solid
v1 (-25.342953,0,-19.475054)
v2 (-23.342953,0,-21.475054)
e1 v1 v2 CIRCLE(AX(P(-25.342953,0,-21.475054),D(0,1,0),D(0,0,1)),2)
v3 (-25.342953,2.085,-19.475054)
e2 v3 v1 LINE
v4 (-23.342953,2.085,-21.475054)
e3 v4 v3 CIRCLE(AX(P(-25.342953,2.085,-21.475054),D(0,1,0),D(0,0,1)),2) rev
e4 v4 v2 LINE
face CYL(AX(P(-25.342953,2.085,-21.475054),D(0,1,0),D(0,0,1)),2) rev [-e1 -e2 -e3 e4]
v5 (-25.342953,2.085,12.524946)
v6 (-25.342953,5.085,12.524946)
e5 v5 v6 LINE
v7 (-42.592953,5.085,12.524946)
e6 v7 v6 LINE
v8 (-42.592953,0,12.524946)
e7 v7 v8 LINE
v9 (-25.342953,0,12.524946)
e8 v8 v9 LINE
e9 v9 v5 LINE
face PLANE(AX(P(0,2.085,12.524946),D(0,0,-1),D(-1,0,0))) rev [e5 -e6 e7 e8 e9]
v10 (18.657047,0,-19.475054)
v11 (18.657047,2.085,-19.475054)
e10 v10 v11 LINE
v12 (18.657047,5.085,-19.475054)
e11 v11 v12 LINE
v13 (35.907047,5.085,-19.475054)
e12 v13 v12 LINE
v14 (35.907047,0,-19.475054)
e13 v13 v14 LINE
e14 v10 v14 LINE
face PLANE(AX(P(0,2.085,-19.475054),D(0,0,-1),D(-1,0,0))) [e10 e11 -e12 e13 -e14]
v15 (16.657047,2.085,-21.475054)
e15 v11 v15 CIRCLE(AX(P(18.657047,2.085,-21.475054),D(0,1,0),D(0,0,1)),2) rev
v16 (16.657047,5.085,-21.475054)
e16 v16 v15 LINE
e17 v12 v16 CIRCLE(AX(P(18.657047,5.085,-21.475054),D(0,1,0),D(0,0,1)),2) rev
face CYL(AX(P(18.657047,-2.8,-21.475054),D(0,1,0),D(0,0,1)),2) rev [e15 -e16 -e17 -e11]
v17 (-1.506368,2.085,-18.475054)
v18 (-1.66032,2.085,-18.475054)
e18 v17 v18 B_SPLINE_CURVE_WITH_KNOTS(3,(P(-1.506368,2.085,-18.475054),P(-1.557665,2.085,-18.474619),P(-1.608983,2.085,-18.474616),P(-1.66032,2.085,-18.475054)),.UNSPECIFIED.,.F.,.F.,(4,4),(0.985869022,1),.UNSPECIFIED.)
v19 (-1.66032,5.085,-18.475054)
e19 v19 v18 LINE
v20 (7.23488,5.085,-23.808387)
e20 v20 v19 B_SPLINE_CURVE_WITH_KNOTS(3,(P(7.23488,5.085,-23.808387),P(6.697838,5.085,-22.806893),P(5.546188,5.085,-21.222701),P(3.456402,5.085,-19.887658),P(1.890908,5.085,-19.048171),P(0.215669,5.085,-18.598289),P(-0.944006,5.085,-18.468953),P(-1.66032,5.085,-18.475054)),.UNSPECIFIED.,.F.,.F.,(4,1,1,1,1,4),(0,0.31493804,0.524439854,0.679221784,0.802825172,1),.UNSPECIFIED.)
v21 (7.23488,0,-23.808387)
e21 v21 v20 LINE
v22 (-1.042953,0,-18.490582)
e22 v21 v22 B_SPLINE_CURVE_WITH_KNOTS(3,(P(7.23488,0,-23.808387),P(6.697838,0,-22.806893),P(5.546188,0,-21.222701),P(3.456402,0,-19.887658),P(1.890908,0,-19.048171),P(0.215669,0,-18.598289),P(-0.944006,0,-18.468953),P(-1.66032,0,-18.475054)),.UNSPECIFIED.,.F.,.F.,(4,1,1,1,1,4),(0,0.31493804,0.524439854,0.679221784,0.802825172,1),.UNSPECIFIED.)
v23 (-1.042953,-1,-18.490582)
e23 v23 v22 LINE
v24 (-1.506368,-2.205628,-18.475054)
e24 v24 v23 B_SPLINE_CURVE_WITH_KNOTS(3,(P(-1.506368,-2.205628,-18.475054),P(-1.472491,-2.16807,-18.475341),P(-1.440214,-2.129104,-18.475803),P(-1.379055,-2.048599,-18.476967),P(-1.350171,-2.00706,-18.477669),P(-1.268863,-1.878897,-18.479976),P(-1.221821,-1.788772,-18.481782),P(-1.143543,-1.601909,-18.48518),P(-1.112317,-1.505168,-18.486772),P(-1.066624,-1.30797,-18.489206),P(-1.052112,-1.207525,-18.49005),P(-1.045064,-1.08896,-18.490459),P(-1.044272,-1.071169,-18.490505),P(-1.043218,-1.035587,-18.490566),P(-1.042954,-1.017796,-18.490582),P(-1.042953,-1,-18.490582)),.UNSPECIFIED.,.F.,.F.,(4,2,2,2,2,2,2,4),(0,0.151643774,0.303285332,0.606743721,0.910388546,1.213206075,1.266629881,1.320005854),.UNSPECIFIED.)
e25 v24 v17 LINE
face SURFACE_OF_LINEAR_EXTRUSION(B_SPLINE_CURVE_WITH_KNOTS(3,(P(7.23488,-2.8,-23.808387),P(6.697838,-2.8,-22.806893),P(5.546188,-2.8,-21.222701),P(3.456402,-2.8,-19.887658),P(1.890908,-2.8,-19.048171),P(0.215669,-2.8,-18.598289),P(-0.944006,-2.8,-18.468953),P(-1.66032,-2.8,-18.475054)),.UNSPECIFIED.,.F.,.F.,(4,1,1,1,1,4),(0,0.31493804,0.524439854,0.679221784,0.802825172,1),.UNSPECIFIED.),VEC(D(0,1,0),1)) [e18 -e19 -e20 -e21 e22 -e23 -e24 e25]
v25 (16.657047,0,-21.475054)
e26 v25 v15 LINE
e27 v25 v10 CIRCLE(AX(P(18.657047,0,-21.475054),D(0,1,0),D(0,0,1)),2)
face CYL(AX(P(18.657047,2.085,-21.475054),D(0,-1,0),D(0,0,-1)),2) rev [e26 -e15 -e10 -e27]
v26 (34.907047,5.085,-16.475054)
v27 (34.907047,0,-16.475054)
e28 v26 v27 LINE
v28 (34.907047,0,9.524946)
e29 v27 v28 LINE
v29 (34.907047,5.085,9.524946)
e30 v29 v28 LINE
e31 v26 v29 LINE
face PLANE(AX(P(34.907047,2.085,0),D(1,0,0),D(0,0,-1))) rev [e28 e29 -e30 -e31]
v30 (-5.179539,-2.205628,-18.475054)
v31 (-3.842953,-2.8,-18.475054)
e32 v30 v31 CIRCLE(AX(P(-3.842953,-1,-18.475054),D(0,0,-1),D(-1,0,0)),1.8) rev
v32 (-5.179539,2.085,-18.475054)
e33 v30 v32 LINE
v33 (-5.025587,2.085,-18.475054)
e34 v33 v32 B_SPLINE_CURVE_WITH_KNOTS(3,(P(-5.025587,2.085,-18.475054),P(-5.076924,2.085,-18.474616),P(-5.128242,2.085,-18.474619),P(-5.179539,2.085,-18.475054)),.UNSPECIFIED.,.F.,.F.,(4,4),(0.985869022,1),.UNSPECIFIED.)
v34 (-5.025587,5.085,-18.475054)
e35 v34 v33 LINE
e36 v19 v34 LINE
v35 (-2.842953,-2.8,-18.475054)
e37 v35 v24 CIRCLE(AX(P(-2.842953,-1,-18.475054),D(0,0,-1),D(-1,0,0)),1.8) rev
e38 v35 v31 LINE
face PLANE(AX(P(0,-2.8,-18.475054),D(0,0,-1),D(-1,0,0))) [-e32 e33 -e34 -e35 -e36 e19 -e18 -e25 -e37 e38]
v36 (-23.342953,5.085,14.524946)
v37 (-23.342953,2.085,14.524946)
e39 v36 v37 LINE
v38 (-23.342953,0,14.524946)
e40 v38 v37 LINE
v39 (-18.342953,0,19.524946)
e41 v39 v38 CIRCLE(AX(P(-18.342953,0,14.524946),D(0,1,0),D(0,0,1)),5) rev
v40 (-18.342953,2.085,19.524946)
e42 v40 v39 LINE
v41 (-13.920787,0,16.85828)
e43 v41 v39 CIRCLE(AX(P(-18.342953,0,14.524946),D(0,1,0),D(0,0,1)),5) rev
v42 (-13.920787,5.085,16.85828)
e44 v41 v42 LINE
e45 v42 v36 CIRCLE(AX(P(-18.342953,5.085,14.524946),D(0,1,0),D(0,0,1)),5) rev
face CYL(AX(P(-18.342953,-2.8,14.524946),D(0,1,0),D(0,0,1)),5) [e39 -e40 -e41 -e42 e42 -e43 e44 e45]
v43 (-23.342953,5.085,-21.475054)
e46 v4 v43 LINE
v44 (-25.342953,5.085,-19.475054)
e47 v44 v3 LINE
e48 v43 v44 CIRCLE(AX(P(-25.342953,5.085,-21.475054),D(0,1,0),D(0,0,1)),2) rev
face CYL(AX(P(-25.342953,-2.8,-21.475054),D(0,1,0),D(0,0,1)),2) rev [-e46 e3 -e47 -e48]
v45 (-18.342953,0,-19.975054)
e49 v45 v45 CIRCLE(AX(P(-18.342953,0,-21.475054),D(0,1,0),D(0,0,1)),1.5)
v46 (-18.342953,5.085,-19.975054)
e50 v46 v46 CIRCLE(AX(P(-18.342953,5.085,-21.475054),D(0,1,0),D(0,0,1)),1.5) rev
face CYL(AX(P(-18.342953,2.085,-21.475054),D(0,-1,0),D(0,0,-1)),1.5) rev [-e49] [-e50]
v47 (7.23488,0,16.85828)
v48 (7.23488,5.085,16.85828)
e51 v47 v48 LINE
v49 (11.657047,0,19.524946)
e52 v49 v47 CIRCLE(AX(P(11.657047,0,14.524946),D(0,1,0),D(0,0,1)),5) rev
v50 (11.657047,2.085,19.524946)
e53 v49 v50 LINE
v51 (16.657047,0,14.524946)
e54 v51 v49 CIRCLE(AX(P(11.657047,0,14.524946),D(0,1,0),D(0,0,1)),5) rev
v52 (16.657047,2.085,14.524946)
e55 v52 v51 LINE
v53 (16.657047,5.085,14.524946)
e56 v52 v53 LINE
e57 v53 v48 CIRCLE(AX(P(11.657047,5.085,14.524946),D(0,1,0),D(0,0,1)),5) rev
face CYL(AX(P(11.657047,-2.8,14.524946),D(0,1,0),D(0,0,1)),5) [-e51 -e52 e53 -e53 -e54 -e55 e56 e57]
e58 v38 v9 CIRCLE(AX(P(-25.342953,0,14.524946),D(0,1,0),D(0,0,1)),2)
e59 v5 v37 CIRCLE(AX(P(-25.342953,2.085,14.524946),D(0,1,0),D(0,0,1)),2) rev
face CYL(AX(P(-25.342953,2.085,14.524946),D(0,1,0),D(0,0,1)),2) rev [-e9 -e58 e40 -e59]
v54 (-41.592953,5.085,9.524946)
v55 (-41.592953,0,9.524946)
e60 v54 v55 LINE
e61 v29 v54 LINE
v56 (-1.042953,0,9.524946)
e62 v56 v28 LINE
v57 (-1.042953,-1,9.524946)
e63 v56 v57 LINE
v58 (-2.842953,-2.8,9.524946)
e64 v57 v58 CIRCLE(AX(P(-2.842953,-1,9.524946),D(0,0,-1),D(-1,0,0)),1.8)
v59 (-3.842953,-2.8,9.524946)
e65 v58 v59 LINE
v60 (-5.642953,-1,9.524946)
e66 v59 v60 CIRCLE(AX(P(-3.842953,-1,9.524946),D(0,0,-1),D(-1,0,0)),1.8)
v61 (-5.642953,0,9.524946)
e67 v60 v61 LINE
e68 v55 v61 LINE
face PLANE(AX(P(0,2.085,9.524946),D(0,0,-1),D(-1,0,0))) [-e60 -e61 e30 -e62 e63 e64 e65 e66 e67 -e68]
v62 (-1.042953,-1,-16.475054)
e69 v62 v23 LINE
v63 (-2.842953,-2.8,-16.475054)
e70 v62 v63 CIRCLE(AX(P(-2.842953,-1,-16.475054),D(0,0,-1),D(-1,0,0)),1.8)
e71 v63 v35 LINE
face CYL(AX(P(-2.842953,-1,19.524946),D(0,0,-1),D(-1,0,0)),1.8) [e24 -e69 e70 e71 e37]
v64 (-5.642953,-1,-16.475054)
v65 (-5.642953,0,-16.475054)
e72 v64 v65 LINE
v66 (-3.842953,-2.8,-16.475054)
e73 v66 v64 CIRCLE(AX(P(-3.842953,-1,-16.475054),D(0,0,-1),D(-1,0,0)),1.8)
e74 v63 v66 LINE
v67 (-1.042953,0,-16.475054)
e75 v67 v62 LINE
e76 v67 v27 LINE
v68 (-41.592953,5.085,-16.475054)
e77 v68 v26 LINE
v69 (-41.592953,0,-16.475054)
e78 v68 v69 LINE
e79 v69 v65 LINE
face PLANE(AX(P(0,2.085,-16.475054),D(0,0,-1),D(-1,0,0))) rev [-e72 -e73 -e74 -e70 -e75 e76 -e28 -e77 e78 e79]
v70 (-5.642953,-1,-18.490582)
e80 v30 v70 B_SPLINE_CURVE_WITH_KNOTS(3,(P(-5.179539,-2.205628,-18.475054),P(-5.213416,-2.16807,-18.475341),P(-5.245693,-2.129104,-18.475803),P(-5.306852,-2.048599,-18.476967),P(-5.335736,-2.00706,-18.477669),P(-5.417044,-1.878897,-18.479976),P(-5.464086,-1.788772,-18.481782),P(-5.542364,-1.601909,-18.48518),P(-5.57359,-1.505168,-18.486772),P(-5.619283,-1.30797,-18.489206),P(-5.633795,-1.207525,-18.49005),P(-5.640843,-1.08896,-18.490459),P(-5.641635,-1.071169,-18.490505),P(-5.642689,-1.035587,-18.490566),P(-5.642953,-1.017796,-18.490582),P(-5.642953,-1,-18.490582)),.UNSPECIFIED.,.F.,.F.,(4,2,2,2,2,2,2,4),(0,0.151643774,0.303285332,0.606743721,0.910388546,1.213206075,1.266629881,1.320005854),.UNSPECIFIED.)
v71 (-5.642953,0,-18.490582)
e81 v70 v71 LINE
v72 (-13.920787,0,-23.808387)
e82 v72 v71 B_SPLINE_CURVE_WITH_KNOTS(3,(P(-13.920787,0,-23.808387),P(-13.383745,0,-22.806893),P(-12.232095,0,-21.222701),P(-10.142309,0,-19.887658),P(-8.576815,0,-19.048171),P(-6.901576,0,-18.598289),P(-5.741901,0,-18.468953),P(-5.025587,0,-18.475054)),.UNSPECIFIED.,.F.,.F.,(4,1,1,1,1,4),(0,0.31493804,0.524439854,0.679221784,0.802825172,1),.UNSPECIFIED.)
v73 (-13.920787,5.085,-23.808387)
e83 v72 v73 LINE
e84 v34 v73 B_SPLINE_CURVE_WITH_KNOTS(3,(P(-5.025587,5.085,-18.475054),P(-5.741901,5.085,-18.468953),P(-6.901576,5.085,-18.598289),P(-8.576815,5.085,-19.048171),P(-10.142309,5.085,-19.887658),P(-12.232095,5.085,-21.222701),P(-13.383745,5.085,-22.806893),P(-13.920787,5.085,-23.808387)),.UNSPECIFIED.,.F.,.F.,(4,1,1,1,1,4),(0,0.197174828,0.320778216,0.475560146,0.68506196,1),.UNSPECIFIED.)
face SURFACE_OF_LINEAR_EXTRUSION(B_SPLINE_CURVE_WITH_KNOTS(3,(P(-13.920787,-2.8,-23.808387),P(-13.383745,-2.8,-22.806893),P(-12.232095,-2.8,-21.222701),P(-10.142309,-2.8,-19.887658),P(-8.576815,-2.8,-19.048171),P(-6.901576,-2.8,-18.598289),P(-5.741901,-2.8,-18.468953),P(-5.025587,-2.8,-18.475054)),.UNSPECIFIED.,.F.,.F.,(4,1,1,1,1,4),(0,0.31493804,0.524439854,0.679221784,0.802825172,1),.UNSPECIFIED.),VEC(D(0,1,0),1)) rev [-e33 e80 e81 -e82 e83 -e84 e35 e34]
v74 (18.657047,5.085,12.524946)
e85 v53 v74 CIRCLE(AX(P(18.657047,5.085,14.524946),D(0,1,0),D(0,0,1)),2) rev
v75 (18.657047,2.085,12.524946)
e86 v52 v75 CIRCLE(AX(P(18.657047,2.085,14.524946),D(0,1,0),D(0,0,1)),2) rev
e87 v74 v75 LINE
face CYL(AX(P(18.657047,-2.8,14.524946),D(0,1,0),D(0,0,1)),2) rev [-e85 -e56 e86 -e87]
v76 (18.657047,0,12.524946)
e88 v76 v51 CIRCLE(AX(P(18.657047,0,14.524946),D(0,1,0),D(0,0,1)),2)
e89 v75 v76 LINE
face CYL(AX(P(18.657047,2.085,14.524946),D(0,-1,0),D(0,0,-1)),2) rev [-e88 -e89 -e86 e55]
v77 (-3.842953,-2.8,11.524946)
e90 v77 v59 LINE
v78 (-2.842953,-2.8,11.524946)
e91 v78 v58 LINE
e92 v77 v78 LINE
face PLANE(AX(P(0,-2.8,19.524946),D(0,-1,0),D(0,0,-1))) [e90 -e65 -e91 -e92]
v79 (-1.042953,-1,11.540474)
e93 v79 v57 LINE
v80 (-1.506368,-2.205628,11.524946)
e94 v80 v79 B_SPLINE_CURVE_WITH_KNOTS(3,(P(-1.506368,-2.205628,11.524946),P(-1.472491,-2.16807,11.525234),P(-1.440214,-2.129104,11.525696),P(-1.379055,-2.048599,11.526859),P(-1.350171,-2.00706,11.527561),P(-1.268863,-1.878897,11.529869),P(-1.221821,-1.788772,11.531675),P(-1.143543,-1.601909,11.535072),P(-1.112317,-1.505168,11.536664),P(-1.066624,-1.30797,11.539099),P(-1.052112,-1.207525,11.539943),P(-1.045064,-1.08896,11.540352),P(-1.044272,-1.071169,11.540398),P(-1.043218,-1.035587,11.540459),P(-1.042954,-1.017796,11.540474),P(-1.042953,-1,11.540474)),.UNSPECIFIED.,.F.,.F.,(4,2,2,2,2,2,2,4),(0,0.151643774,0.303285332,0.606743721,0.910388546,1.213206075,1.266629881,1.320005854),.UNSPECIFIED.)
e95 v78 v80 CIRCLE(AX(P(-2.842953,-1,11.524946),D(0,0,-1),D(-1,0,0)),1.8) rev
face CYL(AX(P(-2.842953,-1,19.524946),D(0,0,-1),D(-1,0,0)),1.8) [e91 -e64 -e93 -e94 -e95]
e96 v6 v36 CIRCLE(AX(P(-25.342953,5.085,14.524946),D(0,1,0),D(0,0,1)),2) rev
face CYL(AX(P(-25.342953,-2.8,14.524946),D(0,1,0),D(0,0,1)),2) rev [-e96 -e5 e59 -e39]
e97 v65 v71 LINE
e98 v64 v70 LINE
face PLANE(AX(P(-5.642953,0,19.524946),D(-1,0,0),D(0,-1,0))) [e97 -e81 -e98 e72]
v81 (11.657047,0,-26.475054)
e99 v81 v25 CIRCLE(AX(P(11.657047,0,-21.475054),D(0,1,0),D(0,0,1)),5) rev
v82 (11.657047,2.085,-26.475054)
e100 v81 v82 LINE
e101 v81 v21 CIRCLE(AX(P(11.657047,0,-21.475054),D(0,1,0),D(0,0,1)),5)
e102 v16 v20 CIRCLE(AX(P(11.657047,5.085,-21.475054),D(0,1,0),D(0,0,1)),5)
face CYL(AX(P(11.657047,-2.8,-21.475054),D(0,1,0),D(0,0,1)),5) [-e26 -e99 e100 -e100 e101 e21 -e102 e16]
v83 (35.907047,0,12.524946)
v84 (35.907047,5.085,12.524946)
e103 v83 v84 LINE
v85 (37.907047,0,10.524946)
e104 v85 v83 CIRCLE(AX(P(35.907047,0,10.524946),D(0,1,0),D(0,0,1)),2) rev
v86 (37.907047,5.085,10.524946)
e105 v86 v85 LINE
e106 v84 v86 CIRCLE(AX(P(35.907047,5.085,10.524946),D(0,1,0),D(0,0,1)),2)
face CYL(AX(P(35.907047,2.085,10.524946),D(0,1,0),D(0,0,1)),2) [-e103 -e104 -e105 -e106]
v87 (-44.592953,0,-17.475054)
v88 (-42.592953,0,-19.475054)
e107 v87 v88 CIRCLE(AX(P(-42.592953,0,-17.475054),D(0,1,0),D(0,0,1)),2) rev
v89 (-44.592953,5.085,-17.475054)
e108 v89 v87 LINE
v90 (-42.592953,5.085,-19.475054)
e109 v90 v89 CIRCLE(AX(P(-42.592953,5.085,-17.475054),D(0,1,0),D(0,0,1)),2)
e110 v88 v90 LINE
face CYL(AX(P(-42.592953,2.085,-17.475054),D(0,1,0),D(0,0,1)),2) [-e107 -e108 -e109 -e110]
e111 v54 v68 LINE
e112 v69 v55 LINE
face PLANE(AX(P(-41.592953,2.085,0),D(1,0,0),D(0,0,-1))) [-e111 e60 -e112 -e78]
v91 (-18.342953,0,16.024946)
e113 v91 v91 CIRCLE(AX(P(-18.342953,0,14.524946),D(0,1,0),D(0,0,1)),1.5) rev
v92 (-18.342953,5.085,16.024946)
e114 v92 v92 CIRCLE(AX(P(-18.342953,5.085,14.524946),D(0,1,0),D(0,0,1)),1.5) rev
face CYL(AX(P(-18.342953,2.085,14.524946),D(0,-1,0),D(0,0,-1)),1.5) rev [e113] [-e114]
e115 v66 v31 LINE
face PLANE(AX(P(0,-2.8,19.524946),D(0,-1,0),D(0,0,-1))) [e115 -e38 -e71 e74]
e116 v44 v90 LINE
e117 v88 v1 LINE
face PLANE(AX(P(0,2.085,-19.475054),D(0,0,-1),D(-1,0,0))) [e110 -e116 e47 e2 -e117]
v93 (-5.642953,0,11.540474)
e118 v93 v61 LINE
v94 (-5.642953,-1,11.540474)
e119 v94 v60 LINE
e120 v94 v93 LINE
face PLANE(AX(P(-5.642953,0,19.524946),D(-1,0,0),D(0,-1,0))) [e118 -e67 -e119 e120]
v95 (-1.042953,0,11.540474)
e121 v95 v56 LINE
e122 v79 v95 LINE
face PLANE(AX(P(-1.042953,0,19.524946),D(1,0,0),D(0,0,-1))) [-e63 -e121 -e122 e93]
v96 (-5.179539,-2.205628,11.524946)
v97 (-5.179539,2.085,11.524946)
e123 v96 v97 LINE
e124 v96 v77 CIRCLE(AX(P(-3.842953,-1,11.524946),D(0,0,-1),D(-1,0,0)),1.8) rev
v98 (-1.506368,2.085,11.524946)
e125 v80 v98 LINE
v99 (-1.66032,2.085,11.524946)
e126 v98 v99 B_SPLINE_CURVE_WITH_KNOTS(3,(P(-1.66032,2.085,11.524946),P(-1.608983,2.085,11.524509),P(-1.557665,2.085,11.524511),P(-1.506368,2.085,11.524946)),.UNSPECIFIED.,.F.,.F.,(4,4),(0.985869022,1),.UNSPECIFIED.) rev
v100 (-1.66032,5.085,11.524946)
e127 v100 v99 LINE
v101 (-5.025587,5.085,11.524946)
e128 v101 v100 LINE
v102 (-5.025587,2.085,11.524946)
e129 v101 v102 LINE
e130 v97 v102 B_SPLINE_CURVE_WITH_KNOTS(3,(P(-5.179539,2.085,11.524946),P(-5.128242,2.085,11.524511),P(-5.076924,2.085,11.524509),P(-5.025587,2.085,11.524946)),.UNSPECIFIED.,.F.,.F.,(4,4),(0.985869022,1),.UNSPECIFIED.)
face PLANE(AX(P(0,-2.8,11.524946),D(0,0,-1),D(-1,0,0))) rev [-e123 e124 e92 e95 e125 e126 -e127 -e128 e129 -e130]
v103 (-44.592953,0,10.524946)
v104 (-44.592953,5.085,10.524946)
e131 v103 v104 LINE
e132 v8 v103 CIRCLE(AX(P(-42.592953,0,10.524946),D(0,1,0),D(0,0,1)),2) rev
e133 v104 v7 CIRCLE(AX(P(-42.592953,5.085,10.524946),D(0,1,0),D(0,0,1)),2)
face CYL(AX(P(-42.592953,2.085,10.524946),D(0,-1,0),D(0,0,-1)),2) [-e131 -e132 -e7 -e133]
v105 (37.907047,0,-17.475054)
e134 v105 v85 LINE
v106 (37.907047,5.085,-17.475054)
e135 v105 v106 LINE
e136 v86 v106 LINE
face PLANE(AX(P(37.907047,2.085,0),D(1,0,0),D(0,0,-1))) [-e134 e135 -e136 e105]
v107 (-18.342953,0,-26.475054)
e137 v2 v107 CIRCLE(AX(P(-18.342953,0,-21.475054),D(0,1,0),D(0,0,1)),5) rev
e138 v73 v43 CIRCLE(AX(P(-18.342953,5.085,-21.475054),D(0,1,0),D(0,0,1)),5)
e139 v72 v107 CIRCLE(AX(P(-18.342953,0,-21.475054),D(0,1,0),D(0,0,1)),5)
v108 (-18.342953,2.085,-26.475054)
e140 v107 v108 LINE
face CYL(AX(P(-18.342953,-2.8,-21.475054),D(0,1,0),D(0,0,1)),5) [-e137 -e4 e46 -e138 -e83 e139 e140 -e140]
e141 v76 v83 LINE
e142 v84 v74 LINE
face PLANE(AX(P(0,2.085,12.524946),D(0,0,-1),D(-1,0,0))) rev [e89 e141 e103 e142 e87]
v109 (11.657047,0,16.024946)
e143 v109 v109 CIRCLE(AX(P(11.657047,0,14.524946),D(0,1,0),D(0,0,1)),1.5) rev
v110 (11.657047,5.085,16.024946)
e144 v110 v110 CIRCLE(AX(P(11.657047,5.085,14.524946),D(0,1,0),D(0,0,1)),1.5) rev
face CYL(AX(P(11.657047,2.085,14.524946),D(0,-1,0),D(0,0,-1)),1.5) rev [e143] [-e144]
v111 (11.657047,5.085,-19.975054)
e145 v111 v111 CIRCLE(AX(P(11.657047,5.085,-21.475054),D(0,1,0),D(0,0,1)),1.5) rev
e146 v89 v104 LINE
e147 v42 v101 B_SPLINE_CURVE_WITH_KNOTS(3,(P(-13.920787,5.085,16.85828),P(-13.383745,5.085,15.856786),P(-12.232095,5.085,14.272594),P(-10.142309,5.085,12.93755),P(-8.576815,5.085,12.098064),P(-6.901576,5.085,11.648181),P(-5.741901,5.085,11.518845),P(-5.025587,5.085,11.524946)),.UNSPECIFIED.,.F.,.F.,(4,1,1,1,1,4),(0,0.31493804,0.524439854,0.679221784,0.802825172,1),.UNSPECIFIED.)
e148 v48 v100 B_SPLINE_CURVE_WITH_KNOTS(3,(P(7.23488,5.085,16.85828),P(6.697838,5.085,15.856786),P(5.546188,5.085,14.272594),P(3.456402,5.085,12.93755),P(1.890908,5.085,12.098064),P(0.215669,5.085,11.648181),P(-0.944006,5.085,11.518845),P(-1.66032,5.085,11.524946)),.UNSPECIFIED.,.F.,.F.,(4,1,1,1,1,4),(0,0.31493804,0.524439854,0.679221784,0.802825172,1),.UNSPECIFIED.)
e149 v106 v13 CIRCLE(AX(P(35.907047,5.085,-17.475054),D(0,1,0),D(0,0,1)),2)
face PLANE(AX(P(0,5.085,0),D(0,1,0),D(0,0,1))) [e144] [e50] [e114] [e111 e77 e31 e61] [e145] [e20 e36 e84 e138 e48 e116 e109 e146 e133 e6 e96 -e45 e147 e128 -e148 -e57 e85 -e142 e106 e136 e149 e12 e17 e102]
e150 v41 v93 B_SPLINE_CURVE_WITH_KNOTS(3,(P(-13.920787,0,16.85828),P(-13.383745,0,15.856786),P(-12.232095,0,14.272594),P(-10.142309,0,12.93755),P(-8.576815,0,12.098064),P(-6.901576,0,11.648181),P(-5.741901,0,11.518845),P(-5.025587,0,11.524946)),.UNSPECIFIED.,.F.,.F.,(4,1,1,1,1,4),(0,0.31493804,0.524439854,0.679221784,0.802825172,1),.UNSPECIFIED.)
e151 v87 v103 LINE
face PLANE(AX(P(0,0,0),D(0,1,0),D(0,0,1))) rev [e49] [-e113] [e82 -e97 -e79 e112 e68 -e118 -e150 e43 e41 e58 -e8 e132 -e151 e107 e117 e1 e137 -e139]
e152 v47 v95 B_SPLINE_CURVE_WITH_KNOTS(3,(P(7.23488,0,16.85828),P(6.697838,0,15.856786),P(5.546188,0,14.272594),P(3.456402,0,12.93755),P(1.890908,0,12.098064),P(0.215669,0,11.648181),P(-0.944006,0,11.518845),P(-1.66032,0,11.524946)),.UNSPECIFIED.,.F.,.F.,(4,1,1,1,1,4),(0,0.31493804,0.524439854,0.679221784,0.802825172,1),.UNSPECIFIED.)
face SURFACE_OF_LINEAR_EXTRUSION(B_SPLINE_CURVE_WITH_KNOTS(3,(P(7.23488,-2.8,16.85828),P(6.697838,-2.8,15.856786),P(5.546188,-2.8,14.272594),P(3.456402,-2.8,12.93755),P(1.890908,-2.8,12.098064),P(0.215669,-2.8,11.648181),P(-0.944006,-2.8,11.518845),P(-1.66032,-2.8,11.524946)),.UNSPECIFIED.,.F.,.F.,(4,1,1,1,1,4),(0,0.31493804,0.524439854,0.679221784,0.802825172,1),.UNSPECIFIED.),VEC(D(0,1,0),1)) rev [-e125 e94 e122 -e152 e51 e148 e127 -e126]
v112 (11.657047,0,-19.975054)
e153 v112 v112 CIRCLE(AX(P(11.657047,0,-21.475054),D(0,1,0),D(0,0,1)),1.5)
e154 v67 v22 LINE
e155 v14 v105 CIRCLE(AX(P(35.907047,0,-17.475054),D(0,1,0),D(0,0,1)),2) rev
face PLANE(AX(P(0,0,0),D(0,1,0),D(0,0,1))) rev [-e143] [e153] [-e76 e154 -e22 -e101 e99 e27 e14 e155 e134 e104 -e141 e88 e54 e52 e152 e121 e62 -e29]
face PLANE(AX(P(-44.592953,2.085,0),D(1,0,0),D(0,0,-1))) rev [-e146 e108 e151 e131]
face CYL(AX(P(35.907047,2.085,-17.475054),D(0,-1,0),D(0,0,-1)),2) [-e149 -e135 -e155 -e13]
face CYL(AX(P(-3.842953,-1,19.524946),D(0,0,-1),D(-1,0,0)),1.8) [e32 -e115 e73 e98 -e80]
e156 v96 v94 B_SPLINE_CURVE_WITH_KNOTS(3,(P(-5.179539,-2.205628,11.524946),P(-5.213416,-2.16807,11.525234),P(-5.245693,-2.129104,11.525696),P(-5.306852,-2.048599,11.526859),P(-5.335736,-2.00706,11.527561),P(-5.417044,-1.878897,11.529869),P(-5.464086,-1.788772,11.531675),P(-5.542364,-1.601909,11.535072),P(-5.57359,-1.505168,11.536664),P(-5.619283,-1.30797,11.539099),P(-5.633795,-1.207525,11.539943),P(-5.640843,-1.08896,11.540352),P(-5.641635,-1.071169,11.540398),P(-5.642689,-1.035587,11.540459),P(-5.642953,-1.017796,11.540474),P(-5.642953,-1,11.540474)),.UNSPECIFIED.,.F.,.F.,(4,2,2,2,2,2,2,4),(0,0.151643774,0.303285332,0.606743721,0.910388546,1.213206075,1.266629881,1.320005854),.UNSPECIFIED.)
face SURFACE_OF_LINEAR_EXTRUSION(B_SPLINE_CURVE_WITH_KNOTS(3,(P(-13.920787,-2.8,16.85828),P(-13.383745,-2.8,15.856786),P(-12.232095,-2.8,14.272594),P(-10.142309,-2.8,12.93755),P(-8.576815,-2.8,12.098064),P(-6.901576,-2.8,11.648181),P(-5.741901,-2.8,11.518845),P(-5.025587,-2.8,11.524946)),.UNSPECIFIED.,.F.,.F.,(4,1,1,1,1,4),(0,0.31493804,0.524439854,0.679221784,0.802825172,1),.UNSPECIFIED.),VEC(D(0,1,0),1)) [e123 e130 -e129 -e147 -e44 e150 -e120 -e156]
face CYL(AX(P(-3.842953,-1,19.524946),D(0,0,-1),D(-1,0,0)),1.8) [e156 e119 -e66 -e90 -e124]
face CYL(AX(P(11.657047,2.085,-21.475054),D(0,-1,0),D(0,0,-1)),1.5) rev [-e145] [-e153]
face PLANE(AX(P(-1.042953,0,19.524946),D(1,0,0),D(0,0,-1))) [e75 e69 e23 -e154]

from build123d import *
from build123d.topology import SkipClean

# Parameters (mm, degrees)
SKETCH1_W           = 40
SKETCH1_H           = 7
SKETCH1_R           = 1.5
SKETCH1_W_2         = 82.5
SKETCH1_H_2         = 32
SKETCH1_W_3         = 76.5
SKETCH1_H_3         = 26
BOSS_EXTRUDE1_DEPTH = 2.085
SKETCH2_W           = 5
SKETCH2_H           = 10
BOSS_EXTRUDE2_DEPTH = 3
FILLET1_R           = 2
FILLET2_R           = 2
CUT_EXTRUDE1_DEPTH  = 65.136818612
SKETCH4_W           = 30
SKETCH4_H           = 6.817038716
CUT_EXTRUDE2_DEPTH  = 53.089568977
FILLET3_R           = 5
FILLET4_R           = 2
BOSS_EXTRUDE3_START = 3
SKETCH5_R           = 1.5
BOSS_EXTRUDE3_DEPTH = 3
FILLET5_START       = 2.085
FILLET5_DEPTH       = 3


with BuildPart() as part:
    # Sketch1 → Boss-Extrude1 (new body)
    # profile 1 of 3: a face of its own
    with BuildSketch(Plane(origin=(0, 0, 0), x_dir=(1, 0, 0), z_dir=(0, 1, 0))):
        with Locations((-3.342953498, -16.024946279)):
            Rectangle(SKETCH1_W, SKETCH1_H)
        with Locations(Location((-18.342953498, -14.524946279, 0), (0, 0, 270))):
            Circle(SKETCH1_R, mode=Mode.SUBTRACT)
        with Locations(Location((11.657046502, -14.524946279, 0), (0, 0, 270))):
            Circle(SKETCH1_R, mode=Mode.SUBTRACT)
    # profile 2 of 3: a face of its own
    with BuildSketch(Plane(origin=(0, 0, 0), x_dir=(1, 0, 0), z_dir=(0, 1, 0))):
        with Locations((-3.342953498, 3.475053721)):
            Rectangle(SKETCH1_W_2, SKETCH1_H_2)
        with Locations((-3.342953498, 3.475053721)):
            Rectangle(SKETCH1_W_3, SKETCH1_H_3, mode=Mode.SUBTRACT)
    # profile 3 of 3: a face of its own
    with BuildSketch(Plane(origin=(0, 0, 0), x_dir=(1, 0, 0), z_dir=(0, 1, 0))):
        with Locations((-3.342953498, 22.975053721)):
            Rectangle(SKETCH1_W, SKETCH1_H)
        with Locations(Location((-18.342953498, 21.475053721, 0), (0, 0, 270))):
            Circle(SKETCH1_R, mode=Mode.SUBTRACT)
        with Locations(Location((11.657046502, 21.475053721, 0), (0, 0, 270))):
            Circle(SKETCH1_R, mode=Mode.SUBTRACT)
    extrude(amount=BOSS_EXTRUDE1_DEPTH)

    # Sketch2 → Boss-Extrude2 (add)
    with BuildSketch(Plane.XZ):
        with Locations((-3.342953498, 14.524946279)):
            Rectangle(SKETCH2_W, SKETCH2_H)
        with Locations((-3.342953498, -21.475053721)):
            Rectangle(SKETCH2_W, SKETCH2_H)
    extrude(amount=BOSS_EXTRUDE2_DEPTH)

    # Fillet1
    fillet1_edges = [part.edges().sort_by_distance(p)[0] for p in [
        (-5.842953498, -3, 14.524946279),
        (-0.842953498, -3, 14.524946279),
        (-0.842953498, -3, -21.475053721),
        (-5.842953498, -3, -21.475053721),
    ]]
    fillet(fillet1_edges, radius=FILLET1_R)

    # Fillet2
    fillet2_edges = [part.edges().sort_by_distance(p)[0] for p in [
        (-44.592953498, 1.0425, 12.524946279),
        (-44.592953498, 1.0425, -19.475053721),
        (37.907046502, 1.0425, -19.475053721),
        (37.907046502, 1.0425, 12.524946279),
    ]]
    fillet(fillet2_edges, radius=FILLET2_R)

    # Sketch3 → Cut-Extrude1 (cut, through all)
    with BuildSketch(Plane(origin=(0, 0, -26.475053721), x_dir=(-1, 0, 0), z_dir=(0, 0, -1))):
        with BuildLine():
            Line((5.842953498, -1), (5.842953498, 0))
            Line((5.842953498, 0), (5.642953498, 0))
            Line((5.642953498, 0), (5.642953498, -1))
            ThreePointArc((5.642953498, -1), (5.115745704, -2.272792206), (3.842953498, -2.8))
            Line((3.842953498, -2.8), (2.842953498, -2.8))
            ThreePointArc((2.842953498, -2.8), (1.570161291, -2.272792206), (1.042953498, -1))
            Line((1.042953498, -1), (1.042953498, 0))
            Line((1.042953498, 0), (0.842953498, 0))
            Line((0.842953498, 0), (0.842953498, -1))
            ThreePointArc((0.842953498, -1), (1.428739935, -2.414213562), (2.842953498, -3))
            Line((2.842953498, -3), (3.842953498, -3))
            ThreePointArc((3.842953498, -3), (5.25716706, -2.414213562), (5.842953498, -1))
        make_face()
    extrude(amount=-CUT_EXTRUDE1_DEPTH, mode=Mode.SUBTRACT)

    # Sketch4 → Cut-Extrude2 (cut, through all)
    with BuildSketch(Plane(origin=(0, 2.085, 0), x_dir=(1, 0, 0), z_dir=(0, 1, 0))):
        with BuildLine():
            Line((-5.025587433, 18.475053721), (-3.342953498, 18.475053721))
            Line((-3.342953498, 18.475053721), (-1.660319563, 18.475053721))
            Line((-1.660319563, 18.475053721), (-1.5063675, 18.475053721))
            add(Edge.make_bspline(
                [(7.234880115, 23.808387054), (6.697838422, 22.80689338), (5.54618786, 21.222701251), (3.456402004, 19.887657692), (1.890908212, 19.048171258), (0.265447838, 18.611656881), (-0.841891354, 18.480685845), (-1.5063675, 18.475053721)],
                knots=[0, 0, 0, 0, 0.31493804, 0.524439854, 0.679221784, 0.802825172, 0.985869019, 0.985869019, 0.985869019, 0.985869019], degree=3))
            ThreePointArc((7.234880115, 23.808387054), (9.075057605, 25.756797914), (11.657046502, 26.475053721))
            Line((11.657046502, 26.475053721), (-18.342953498, 26.475053721))
            ThreePointArc((-18.342953498, 26.475053721), (-15.7609646, 25.756797914), (-13.92078711, 23.808387054))
            add(Edge.make_bspline(
                [(-13.92078711, 23.808387054), (-13.383745417, 22.80689338), (-12.232094855, 21.222701251), (-10.142308999, 19.887657692), (-8.576815207, 19.048171258), (-6.951354833, 18.611656881), (-5.844015641, 18.480685845), (-5.179539495, 18.475053721)],
                knots=[0, 0, 0, 0, 0.31493804, 0.524439854, 0.679221784, 0.802825172, 0.985869019, 0.985869019, 0.985869019, 0.985869019], degree=3))
            Line((-5.179539495, 18.475053721), (-5.025587433, 18.475053721))
        make_face()
        with Locations((-3.342953498, 29.883573079)):
            Rectangle(SKETCH4_W, SKETCH4_H)
        with BuildLine():
            ThreePointArc((-13.92078711, -16.858279612), (-15.7609646, -18.806690472), (-18.342953498, -19.524946279))
            Line((-18.342953498, -19.524946279), (11.657046502, -19.524946279))
            ThreePointArc((11.657046502, -19.524946279), (9.075057605, -18.806690472), (7.234880115, -16.858279612))
            add(Edge.make_bspline(
                [(7.234880115, -16.858279612), (6.697838422, -15.856785937), (5.54618786, -14.272593809), (3.456402004, -12.937550249), (1.890908212, -12.098063816), (0.265447838, -11.661549439), (-0.841891354, -11.530578403), (-1.5063675, -11.524946279)],
                knots=[0, 0, 0, 0, 0.31493804, 0.524439854, 0.679221784, 0.802825172, 0.985869019, 0.985869019, 0.985869019, 0.985869019], degree=3))
            Line((-1.5063675, -11.524946279), (-1.660319563, -11.524946279))
            Line((-1.660319563, -11.524946279), (-3.342953498, -11.524946279))
            Line((-3.342953498, -11.524946279), (-5.025587433, -11.524946279))
            Line((-5.025587433, -11.524946279), (-5.179539495, -11.524946279))
            add(Edge.make_bspline(
                [(-13.92078711, -16.858279612), (-13.383745417, -15.856785937), (-12.232094855, -14.272593809), (-10.142308999, -12.937550249), (-8.576815207, -12.098063816), (-6.951354833, -11.661549439), (-5.844015641, -11.530578403), (-5.179539495, -11.524946279)],
                knots=[0, 0, 0, 0, 0.31493804, 0.524439854, 0.679221784, 0.802825172, 0.985869019, 0.985869019, 0.985869019, 0.985869019], degree=3))
        make_face()
        with Locations((-3.342953498, -22.933465637)):
            Rectangle(SKETCH4_W, SKETCH4_H)
    extrude(amount=-CUT_EXTRUDE2_DEPTH, mode=Mode.SUBTRACT)

    # Fillet3
    fillet3_edges = [part.edges().sort_by_distance(p)[0] for p in [
        (16.657046502, 1.0425, -26.475053721),
        (-23.342953498, 1.0425, -26.475053721),
        (-23.342953498, 1.0425, 19.524946279),
        (16.657046502, 1.0425, 19.524946279),
    ]]
    fillet(fillet3_edges, radius=FILLET3_R - 0.0001)  # a hair under: the kernel refuses the full size

    # Fillet4
    fillet4_edges = [part.edges().sort_by_distance(p)[0] for p in [
        (-23.342953498, 1.0425, 12.524946279),
        (-23.342953498, 1.0425, -19.475053721),
        (16.657046502, 1.0425, -19.475053721),
        (16.657046502, 1.0425, 12.524946279),
    ]]
    fillet(fillet4_edges, radius=FILLET4_R)

    # Sketch5 → Boss-Extrude3 (add)
    # profile 1 of 26: a face of its own
    with SkipClean():  # the faces are left unmerged after this step: merging them gives an invalid solid
        with BuildSketch(Plane(origin=(0, 2.085, 0), x_dir=(1, 0, 0), z_dir=(0, 1, 0)).offset(BOSS_EXTRUDE3_START)):
            with BuildLine():
                ThreePointArc((-18.343003498, 26.475053721), (-21.878490939, 25.010584091), (-23.342953497, 21.475093721))
                ThreePointArc((-23.342953497, 21.475093721), (-23.237489148, 20.453525081), (-22.925529193, 19.475053721))
                Line((-22.925529193, 19.475053721), (-14.342953498, 19.475053721))
                Line((-14.342953498, 19.475053721), (-14.342953498, 24.475053721))
                ThreePointArc((-14.342953498, 24.475053721), (-16.106907881, 25.947200856), (-18.343003498, 26.475053721))
            make_face()
            with Locations((-18.342953498, 21.475053721)):
                Circle(SKETCH5_R, mode=Mode.SUBTRACT)
        # profile 2 of 26: a face of its own
        with BuildSketch(Plane(origin=(0, 2.085, 0), x_dir=(1, 0, 0), z_dir=(0, 1, 0)).offset(BOSS_EXTRUDE3_START)):
            with BuildLine():
                Line((-22.925529193, 19.475053721), (-23.342953498, 19.475053721))
                Line((-23.342953498, 19.475053721), (-23.342953498, 16.475053721))
                Line((-23.342953498, 16.475053721), (-18.342953499, 16.475053721))
                ThreePointArc((-18.342953499, 16.475053721), (-21.081566286, 17.291753589), (-22.925529193, 19.475053721))
            make_face()
        # profile 3 of 26: a face of its own
        with BuildSketch(Plane(origin=(0, 2.085, 0), x_dir=(1, 0, 0), z_dir=(0, 1, 0)).offset(BOSS_EXTRUDE3_START)):
            with BuildLine():
                Line((-23.342953498, 16.475053721), (-23.342953498, 19.475053721))
                Line((-23.342953498, 19.475053721), (-25.342953498, 19.475053721))
                Line((-25.342953498, 19.475053721), (-42.592953498, 19.475053721))
                ThreePointArc((-42.592953498, 19.475053721), (-44.00716706, 18.889267283), (-44.592953498, 17.475053721))
                Line((-44.592953498, 17.475053721), (-44.592953498, -10.524946279))
                ThreePointArc((-44.592953498, -10.524946279), (-44.00716706, -11.939159841), (-42.592953498, -12.524946279))
                Line((-42.592953498, -12.524946279), (-25.342953498, -12.524946279))
                Line((-25.342953498, -12.524946279), (-23.342953498, -12.524946279))
                Line((-23.342953498, -12.524946279), (-23.342953498, -9.524946279))
                Line((-23.342953498, -9.524946279), (-41.592953498, -9.524946279))
                Line((-41.592953498, -9.524946279), (-41.592953498, 16.475053721))
                Line((-41.592953498, 16.475053721), (-23.342953498, 16.475053721))
            make_face()
        # profile 4 of 26: a face of its own
        with BuildSketch(Plane(origin=(0, 2.085, 0), x_dir=(1, 0, 0), z_dir=(0, 1, 0)).offset(BOSS_EXTRUDE3_START)):
            with BuildLine():
                Line((-14.342953498, 19.475053721), (-22.925529193, 19.475053721))
                ThreePointArc((-22.925529193, 19.475053721), (-21.081566286, 17.291753589), (-18.342953499, 16.475053721))
                ThreePointArc((-18.342953499, 16.475053721), (-16.106885521, 17.002917766), (-14.342953498, 18.475053721))
                Line((-14.342953498, 18.475053721), (-14.342953498, 19.475053721))
            make_face()
        # profile 5 of 26: a face of its own
        with BuildSketch(Plane(origin=(0, 2.085, 0), x_dir=(1, 0, 0), z_dir=(0, 1, 0)).offset(BOSS_EXTRUDE3_START)):
            with BuildLine():
                ThreePointArc((-13.92078711, 23.808387054), (-14.118698205, 24.150061614), (-14.342953498, 24.475053721))
                Line((-14.342953498, 24.475053721), (-14.342953498, 19.475053721))
                Line((-14.342953498, 19.475053721), (-13.760377803, 19.475053721))
                ThreePointArc((-13.760377803, 19.475053721), (-13.448421933, 20.453505503), (-13.342953498, 21.475053721))
                ThreePointArc((-13.342953498, 21.475053721), (-13.489561285, 22.676962217), (-13.92078711, 23.808387054))
            make_face()
        # profile 6 of 26: a face of its own
        with BuildSketch(Plane(origin=(0, 2.085, 0), x_dir=(1, 0, 0), z_dir=(0, 1, 0)).offset(BOSS_EXTRUDE3_START)):
            with BuildLine():
                Line((-13.760377803, 19.475053721), (-14.342953498, 19.475053721))
                Line((-14.342953498, 19.475053721), (-14.342953498, 18.475053721))
                ThreePointArc((-14.342953498, 18.475053721), (-14.022635061, 18.958141206), (-13.760377803, 19.475053721))
            make_face()
        # profile 7 of 26: a face of its own
        with BuildSketch(Plane(origin=(0, 2.085, 0), x_dir=(1, 0, 0), z_dir=(0, 1, 0)).offset(BOSS_EXTRUDE3_START)):
            with BuildLine():
                ThreePointArc((-14.342953498, 18.475053721), (-16.106885521, 17.002917766), (-18.342953499, 16.475053721))
                Line((-18.342953499, 16.475053721), (11.657046523, 16.475053721))
                ThreePointArc((11.657046523, 16.475053721), (9.420978534, 17.002917762), (7.657046502, 18.475053721))
                Line((7.657046502, 18.475053721), (-1.5063675, 18.475053721))
                add(Edge.make_bspline(
                    [(-1.5063675, 18.475053721), (-1.557665042, 18.474618921), (-1.608983344, 18.47461649), (-1.660319563, 18.475053721)],
                    knots=[0.985869019, 0.985869019, 0.985869019, 0.985869019, 1, 1, 1, 1], degree=3))
                Line((-1.660319563, 18.475053721), (-3.342953498, 18.475053721))
                Line((-3.342953498, 18.475053721), (-5.025587433, 18.475053721))
                add(Edge.make_bspline(
                    [(-5.179539495, 18.475053721), (-5.128241953, 18.474618921), (-5.076923651, 18.47461649), (-5.025587433, 18.475053721)],
                    knots=[0.985869019, 0.985869019, 0.985869019, 0.985869019, 1, 1, 1, 1], degree=3))
                Line((-5.179539495, 18.475053721), (-14.342953498, 18.475053721))
            make_face()
        # profile 8 of 26: a face of its own
        with BuildSketch(Plane(origin=(0, 2.085, 0), x_dir=(1, 0, 0), z_dir=(0, 1, 0)).offset(BOSS_EXTRUDE3_START)):
            with BuildLine():
                add(Edge.make_bspline(
                    [(-13.92078711, 23.808387054), (-13.383745417, 22.80689338), (-12.232094855, 21.222701251), (-10.424029044, 20.067632367), (-9.557996846, 19.581589064), (-9.354549961, 19.475053721)],
                    knots=[0, 0, 0, 0, 0.31493804, 0.524439854, 0.587657191, 0.587657191, 0.587657191, 0.587657191], degree=3))
                ThreePointArc((-13.92078711, 23.808387054), (-13.489561285, 22.676962217), (-13.342953498, 21.475053721))
                ThreePointArc((-13.342953498, 21.475053721), (-13.448421933, 20.453505503), (-13.760377803, 19.475053721))
                Line((-13.760377803, 19.475053721), (-9.354549961, 19.475053721))
            make_face()
        # profile 9 of 26: a face of its own
        with BuildSketch(Plane(origin=(0, 2.085, 0), x_dir=(1, 0, 0), z_dir=(0, 1, 0)).offset(BOSS_EXTRUDE3_START)):
            with BuildLine():
                ThreePointArc((-13.760377803, 19.475053721), (-14.022635061, 18.958141206), (-14.342953498, 18.475053721))
                Line((-14.342953498, 18.475053721), (-5.179539495, 18.475053721))
                add(Edge.make_bspline(
                    [(-9.354549961, 19.475053721), (-9.059875559, 19.320746917), (-8.354121704, 18.98836733), (-6.951354833, 18.611656881), (-5.844015641, 18.480685845), (-5.179539495, 18.475053721)],
                    knots=[0.587657191, 0.587657191, 0.587657191, 0.587657191, 0.679221784, 0.802825172, 0.985869019, 0.985869019, 0.985869019, 0.985869019], degree=3))
                Line((-9.354549961, 19.475053721), (-13.760377803, 19.475053721))
            make_face()
        # profile 10 of 26: a face of its own
        with BuildSketch(Plane(origin=(0, 2.085, 0), x_dir=(1, 0, 0), z_dir=(0, 1, 0)).offset(BOSS_EXTRUDE3_START)):
            with BuildLine():
                ThreePointArc((16.239622197, 19.475053721), (14.395659298, 17.291753594), (11.657046523, 16.475053721))
                Line((11.657046523, 16.475053721), (16.657046502, 16.475053721))
                Line((16.657046502, 16.475053721), (16.657046502, 19.475053721))
                Line((16.657046502, 19.475053721), (16.239622197, 19.475053721))
            make_face()
        # profile 11 of 26: a face of its own
        with BuildSketch(Plane(origin=(0, 2.085, 0), x_dir=(1, 0, 0), z_dir=(0, 1, 0)).offset(BOSS_EXTRUDE3_START)):
            with BuildLine():
                ThreePointArc((7.657046502, 18.475053721), (9.420978534, 17.002917762), (11.657046523, 16.475053721))
                ThreePointArc((11.657046523, 16.475053721), (14.395659298, 17.291753594), (16.239622197, 19.475053721))
                Line((16.239622197, 19.475053721), (7.074470807, 19.475053721))
                ThreePointArc((7.074470807, 19.475053721), (7.336728066, 18.958141206), (7.657046502, 18.475053721))
            make_face()
        # profile 12 of 26: a face of its own
        with BuildSketch(Plane(origin=(0, 2.085, 0), x_dir=(1, 0, 0), z_dir=(0, 1, 0)).offset(BOSS_EXTRUDE3_START)):
            with BuildLine():
                Line((16.657046502, 19.475053721), (16.657046502, 16.475053721))
                Line((16.657046502, 16.475053721), (34.907046502, 16.475053721))
                Line((34.907046502, 16.475053721), (34.907046502, -9.524946279))
                Line((34.907046502, -9.524946279), (16.657046502, -9.524946279))
                Line((16.657046502, -9.524946279), (16.657046502, -12.524946279))
                Line((16.657046502, -12.524946279), (18.657046502, -12.524946279))
                Line((18.657046502, -12.524946279), (35.907046502, -12.524946279))
                ThreePointArc((35.907046502, -12.524946279), (37.321260065, -11.939159841), (37.907046502, -10.524946279))
                Line((37.907046502, -10.524946279), (37.907046502, 17.475053721))
                ThreePointArc((37.907046502, 17.475053721), (37.321260065, 18.889267283), (35.907046502, 19.475053721))
                Line((35.907046502, 19.475053721), (18.657046502, 19.475053721))
                Line((18.657046502, 19.475053721), (16.657046502, 19.475053721))
            make_face()
        # profile 13 of 26: a face of its own
        with BuildSketch(Plane(origin=(0, 2.085, 0), x_dir=(1, 0, 0), z_dir=(0, 1, 0)).offset(BOSS_EXTRUDE3_START)):
            with BuildLine():
                Line((-1.5063675, 18.475053721), (7.657046502, 18.475053721))
                ThreePointArc((7.657046502, 18.475053721), (7.336728066, 18.958141206), (7.074470807, 19.475053721))
                Line((7.074470807, 19.475053721), (2.668642966, 19.475053721))
                add(Edge.make_bspline(
                    [(2.668642966, 19.475053721), (2.373968563, 19.320746917), (1.668214709, 18.98836733), (0.265447838, 18.611656881), (-0.841891354, 18.480685845), (-1.5063675, 18.475053721)],
                    knots=[0.587657191, 0.587657191, 0.587657191, 0.587657191, 0.679221784, 0.802825172, 0.985869019, 0.985869019, 0.985869019, 0.985869019], degree=3))
            make_face()
        # profile 14 of 26: a face of its own
        with BuildSketch(Plane(origin=(0, 2.085, 0), x_dir=(1, 0, 0), z_dir=(0, 1, 0)).offset(BOSS_EXTRUDE3_START)):
            with BuildLine():
                Line((7.074470807, 19.475053721), (16.239622197, 19.475053721))
                ThreePointArc((16.239622197, 19.475053721), (16.551578067, 20.453505503), (16.657046502, 21.475053721))
                ThreePointArc((16.657046502, 21.475053721), (15.192598086, 25.010569949), (11.657096502, 26.475053721))
                ThreePointArc((11.657096502, 26.475053721), (9.075079014, 25.756810824), (7.234880115, 23.808387054))
                ThreePointArc((7.234880115, 23.808387054), (6.66046873, 21.660014702), (7.074470807, 19.475053721))
            make_face()
            with Locations((11.657046502, 21.475053721)):
                Circle(SKETCH5_R, mode=Mode.SUBTRACT)
        # profile 15 of 26: a face of its own
        with BuildSketch(Plane(origin=(0, 2.085, 0), x_dir=(1, 0, 0), z_dir=(0, 1, 0)).offset(BOSS_EXTRUDE3_START)):
            with BuildLine():
                Line((-18.342953493, -9.524946279), (-23.342953498, -9.524946279))
                Line((-23.342953498, -9.524946279), (-23.342953498, -12.524946279))
                Line((-23.342953498, -12.524946279), (-22.925529193, -12.524946279))
                ThreePointArc((-22.925529193, -12.524946279), (-21.081566283, -10.341646145), (-18.342953493, -9.524946279))
            make_face()
        # profile 16 of 26: a face of its own
        with BuildSketch(Plane(origin=(0, 2.085, 0), x_dir=(1, 0, 0), z_dir=(0, 1, 0)).offset(BOSS_EXTRUDE3_START)):
            with BuildLine():
                add(Edge.make_bspline(
                    [(7.234880115, 23.808387054), (6.697838422, 22.80689338), (5.54618786, 21.222701251), (3.738122049, 20.067632367), (2.872089851, 19.581589064), (2.668642966, 19.475053721)],
                    knots=[0, 0, 0, 0, 0.31493804, 0.524439854, 0.587657191, 0.587657191, 0.587657191, 0.587657191], degree=3))
                Line((2.668642966, 19.475053721), (7.074470807, 19.475053721))
                ThreePointArc((7.074470807, 19.475053721), (6.66046873, 21.660014702), (7.234880115, 23.808387054))
            make_face()
        # profile 17 of 26: a face of its own
        with BuildSketch(Plane(origin=(0, 2.085, 0), x_dir=(1, 0, 0), z_dir=(0, 1, 0)).offset(BOSS_EXTRUDE3_START)):
            with BuildLine():
                Line((11.657046502, -9.524946279), (-18.342953493, -9.524946279))
                ThreePointArc((-18.342953493, -9.524946279), (-16.106885518, -10.052810325), (-14.342953498, -11.524946279))
                Line((-14.342953498, -11.524946279), (-5.179539495, -11.524946279))
                add(Edge.make_bspline(
                    [(-5.179539495, -11.524946279), (-5.128241953, -11.524511479), (-5.076923651, -11.524509048), (-5.025587433, -11.524946279)],
                    knots=[0.985869019, 0.985869019, 0.985869019, 0.985869019, 1, 1, 1, 1], degree=3))
                Line((-5.025587433, -11.524946279), (-3.342953498, -11.524946279))
                Line((-3.342953498, -11.524946279), (-1.660319563, -11.524946279))
                add(Edge.make_bspline(
                    [(-1.5063675, -11.524946279), (-1.557665042, -11.524511479), (-1.608983344, -11.524509048), (-1.660319563, -11.524946279)],
                    knots=[0.985869019, 0.985869019, 0.985869019, 0.985869019, 1, 1, 1, 1], degree=3))
                Line((-1.5063675, -11.524946279), (7.657046502, -11.524946279))
                ThreePointArc((7.657046502, -11.524946279), (9.420978525, -10.052810324), (11.657046502, -9.524946279))
            make_face()
        # profile 18 of 26: a face of its own
        with BuildSketch(Plane(origin=(0, 2.085, 0), x_dir=(1, 0, 0), z_dir=(0, 1, 0)).offset(BOSS_EXTRUDE3_START)):
            with BuildLine():
                ThreePointArc((-14.342953498, -11.524946279), (-16.106885518, -10.052810325), (-18.342953493, -9.524946279))
                ThreePointArc((-18.342953493, -9.524946279), (-21.081566283, -10.341646145), (-22.925529193, -12.524946279))
                Line((-22.925529193, -12.524946279), (-13.760377803, -12.524946279))
                ThreePointArc((-13.760377803, -12.524946279), (-14.022635061, -12.008033764), (-14.342953498, -11.524946279))
            make_face()
        # profile 19 of 26: a face of its own
        with BuildSketch(Plane(origin=(0, 2.085, 0), x_dir=(1, 0, 0), z_dir=(0, 1, 0)).offset(BOSS_EXTRUDE3_START)):
            with BuildLine():
                Line((16.657046502, -9.524946279), (11.657046502, -9.524946279))
                ThreePointArc((11.657046502, -9.524946279), (14.39565929, -10.341646146), (16.239622197, -12.524946279))
                Line((16.239622197, -12.524946279), (16.657046502, -12.524946279))
                Line((16.657046502, -12.524946279), (16.657046502, -9.524946279))
            make_face()
        # profile 20 of 26: a face of its own
        with BuildSketch(Plane(origin=(0, 2.085, 0), x_dir=(1, 0, 0), z_dir=(0, 1, 0)).offset(BOSS_EXTRUDE3_START)):
            with BuildLine():
                ThreePointArc((16.239622197, -12.524946279), (14.39565929, -10.341646146), (11.657046502, -9.524946279))
                ThreePointArc((11.657046502, -9.524946279), (9.420978525, -10.052810324), (7.657046502, -11.524946279))
                ThreePointArc((7.657046502, -11.524946279), (7.336728066, -12.008033764), (7.074470807, -12.524946279))
                Line((7.074470807, -12.524946279), (16.239622197, -12.524946279))
            make_face()
        # profile 21 of 26: a face of its own
        with BuildSketch(Plane(origin=(0, 2.085, 0), x_dir=(1, 0, 0), z_dir=(0, 1, 0)).offset(BOSS_EXTRUDE3_START)):
            with BuildLine():
                Line((-5.179539495, -11.524946279), (-14.342953498, -11.524946279))
                ThreePointArc((-14.342953498, -11.524946279), (-14.022635061, -12.008033764), (-13.760377803, -12.524946279))
                Line((-13.760377803, -12.524946279), (-9.354549961, -12.524946279))
                add(Edge.make_bspline(
                    [(-9.354549961, -12.524946279), (-9.059875559, -12.370639475), (-8.354121704, -12.038259888), (-6.951354833, -11.661549439), (-5.844015641, -11.530578403), (-5.179539495, -11.524946279)],
                    knots=[0.587657191, 0.587657191, 0.587657191, 0.587657191, 0.679221784, 0.802825172, 0.985869019, 0.985869019, 0.985869019, 0.985869019], degree=3))
            make_face()
        # profile 22 of 26: a face of its own
        with BuildSketch(Plane(origin=(0, 2.085, 0), x_dir=(1, 0, 0), z_dir=(0, 1, 0)).offset(BOSS_EXTRUDE3_START)):
            with BuildLine():
                Line((-13.760377803, -12.524946279), (-22.925529193, -12.524946279))
                ThreePointArc((-22.925529193, -12.524946279), (-23.237489148, -13.503417639), (-23.342953497, -14.524986279))
                ThreePointArc((-23.342953497, -14.524986279), (-21.878490939, -18.060476649), (-18.343003498, -19.524946279))
                ThreePointArc((-18.343003498, -19.524946279), (-15.760986009, -18.806703382), (-13.92078711, -16.858279612))
                ThreePointArc((-13.92078711, -16.858279612), (-13.489561285, -15.726854775), (-13.342953498, -14.524946279))
                ThreePointArc((-13.342953498, -14.524946279), (-13.448421933, -13.50339806), (-13.760377803, -12.524946279))
            make_face()
            with Locations((-18.342953498, -14.524946279)):
                Circle(SKETCH5_R, mode=Mode.SUBTRACT)
        # profile 23 of 26: a face of its own
        with BuildSketch(Plane(origin=(0, 2.085, 0), x_dir=(1, 0, 0), z_dir=(0, 1, 0)).offset(BOSS_EXTRUDE3_START)):
            with BuildLine():
                ThreePointArc((16.657046502, -14.524946279), (16.551578067, -13.50339806), (16.239622197, -12.524946279))
                Line((16.239622197, -12.524946279), (7.074470807, -12.524946279))
                ThreePointArc((7.074470807, -12.524946279), (6.66046873, -14.709907259), (7.234880115, -16.858279612))
                ThreePointArc((7.234880115, -16.858279612), (9.075079014, -18.806703382), (11.657096502, -19.524946279))
                ThreePointArc((11.657096502, -19.524946279), (15.192598086, -18.060462507), (16.657046502, -14.524946279))
            make_face()
            with Locations((11.657046502, -14.524946279)):
                Circle(SKETCH5_R, mode=Mode.SUBTRACT)
        # profile 24 of 26: a face of its own
        with BuildSketch(Plane(origin=(0, 2.085, 0), x_dir=(1, 0, 0), z_dir=(0, 1, 0)).offset(BOSS_EXTRUDE3_START)):
            with BuildLine():
                ThreePointArc((7.074470807, -12.524946279), (7.336728066, -12.008033764), (7.657046502, -11.524946279))
                Line((7.657046502, -11.524946279), (-1.5063675, -11.524946279))
                add(Edge.make_bspline(
                    [(2.668642966, -12.524946279), (2.373968563, -12.370639475), (1.668214709, -12.038259888), (0.265447838, -11.661549439), (-0.841891354, -11.530578403), (-1.5063675, -11.524946279)],
                    knots=[0.587657191, 0.587657191, 0.587657191, 0.587657191, 0.679221784, 0.802825172, 0.985869019, 0.985869019, 0.985869019, 0.985869019], degree=3))
                Line((2.668642966, -12.524946279), (7.074470807, -12.524946279))
            make_face()
        # profile 25 of 26: a face of its own
        with BuildSketch(Plane(origin=(0, 2.085, 0), x_dir=(1, 0, 0), z_dir=(0, 1, 0)).offset(BOSS_EXTRUDE3_START)):
            with BuildLine():
                Line((-9.354549961, -12.524946279), (-13.760377803, -12.524946279))
                ThreePointArc((-13.760377803, -12.524946279), (-13.448421933, -13.50339806), (-13.342953498, -14.524946279))
                ThreePointArc((-13.342953498, -14.524946279), (-13.489561285, -15.726854775), (-13.92078711, -16.858279612))
                add(Edge.make_bspline(
                    [(-13.92078711, -16.858279612), (-13.383745417, -15.856785937), (-12.232094855, -14.272593809), (-10.424029044, -13.117524925), (-9.557996846, -12.631481622), (-9.354549961, -12.524946279)],
                    knots=[0, 0, 0, 0, 0.31493804, 0.524439854, 0.587657191, 0.587657191, 0.587657191, 0.587657191], degree=3))
            make_face()
        # profile 26 of 26: a face of its own
        with BuildSketch(Plane(origin=(0, 2.085, 0), x_dir=(1, 0, 0), z_dir=(0, 1, 0)).offset(BOSS_EXTRUDE3_START)):
            with BuildLine():
                ThreePointArc((7.234880115, -16.858279612), (6.66046873, -14.709907259), (7.074470807, -12.524946279))
                Line((7.074470807, -12.524946279), (2.668642966, -12.524946279))
                add(Edge.make_bspline(
                    [(7.234880115, -16.858279612), (6.697838422, -15.856785937), (5.54618786, -14.272593809), (3.738122049, -13.117524925), (2.872089851, -12.631481622), (2.668642966, -12.524946279)],
                    knots=[0, 0, 0, 0, 0.31493804, 0.524439854, 0.587657191, 0.587657191, 0.587657191, 0.587657191], degree=3))
            make_face()
        extrude(amount=-BOSS_EXTRUDE3_DEPTH)
    add(part.part.scale(1), mode=Mode.REPLACE)  # the faces are merged on a copy

    # Fillet5: read off the stored shape, not the designer's step
    # Fillet5 outline → Fillet5 (add)
    with SkipClean():  # the faces are left unmerged after this step: merging them gives an invalid solid
        with BuildSketch(Plane(origin=(0, 0, 0), x_dir=(1, 0, 0), z_dir=(0, 1, 0)).offset(FILLET5_START)):
            with BuildLine():
                ThreePointArc((16.657046502, -14.524946279), (17.24283294, -13.110732717), (18.657046502, -12.524946279))
                Line((18.657046502, -12.524946279), (16.239622197, -12.524946279))
                ThreePointArc((16.239622197, -12.524946279), (16.551578067, -13.503398061), (16.657046502, -14.524946279))
            make_face()
            with BuildLine():
                ThreePointArc((-25.342953498, -12.524946279), (-23.928739935, -13.110732716), (-23.342953498, -14.524946279))
                ThreePointArc((-23.342953498, -14.524946279), (-23.237485063, -13.503398061), (-22.925529193, -12.524946279))
                Line((-22.925529193, -12.524946279), (-25.342953498, -12.524946279))
            make_face()
            with BuildLine():
                ThreePointArc((-23.342953498, 21.475053721), (-23.928739936, 20.060840158), (-25.342953498, 19.475053721))
                Line((-25.342953498, 19.475053721), (-22.925529193, 19.475053721))
                ThreePointArc((-22.925529193, 19.475053721), (-23.237485063, 20.453505503), (-23.342953498, 21.475053721))
            make_face()
            with BuildLine():
                ThreePointArc((18.657046502, 19.475053721), (17.24283294, 20.060840159), (16.657046502, 21.475053721))
                ThreePointArc((16.657046502, 21.475053721), (16.551578067, 20.453505503), (16.239622197, 19.475053721))
                Line((16.239622197, 19.475053721), (18.657046502, 19.475053721))
            make_face()
        extrude(amount=FILLET5_DEPTH)


solid = part.part
